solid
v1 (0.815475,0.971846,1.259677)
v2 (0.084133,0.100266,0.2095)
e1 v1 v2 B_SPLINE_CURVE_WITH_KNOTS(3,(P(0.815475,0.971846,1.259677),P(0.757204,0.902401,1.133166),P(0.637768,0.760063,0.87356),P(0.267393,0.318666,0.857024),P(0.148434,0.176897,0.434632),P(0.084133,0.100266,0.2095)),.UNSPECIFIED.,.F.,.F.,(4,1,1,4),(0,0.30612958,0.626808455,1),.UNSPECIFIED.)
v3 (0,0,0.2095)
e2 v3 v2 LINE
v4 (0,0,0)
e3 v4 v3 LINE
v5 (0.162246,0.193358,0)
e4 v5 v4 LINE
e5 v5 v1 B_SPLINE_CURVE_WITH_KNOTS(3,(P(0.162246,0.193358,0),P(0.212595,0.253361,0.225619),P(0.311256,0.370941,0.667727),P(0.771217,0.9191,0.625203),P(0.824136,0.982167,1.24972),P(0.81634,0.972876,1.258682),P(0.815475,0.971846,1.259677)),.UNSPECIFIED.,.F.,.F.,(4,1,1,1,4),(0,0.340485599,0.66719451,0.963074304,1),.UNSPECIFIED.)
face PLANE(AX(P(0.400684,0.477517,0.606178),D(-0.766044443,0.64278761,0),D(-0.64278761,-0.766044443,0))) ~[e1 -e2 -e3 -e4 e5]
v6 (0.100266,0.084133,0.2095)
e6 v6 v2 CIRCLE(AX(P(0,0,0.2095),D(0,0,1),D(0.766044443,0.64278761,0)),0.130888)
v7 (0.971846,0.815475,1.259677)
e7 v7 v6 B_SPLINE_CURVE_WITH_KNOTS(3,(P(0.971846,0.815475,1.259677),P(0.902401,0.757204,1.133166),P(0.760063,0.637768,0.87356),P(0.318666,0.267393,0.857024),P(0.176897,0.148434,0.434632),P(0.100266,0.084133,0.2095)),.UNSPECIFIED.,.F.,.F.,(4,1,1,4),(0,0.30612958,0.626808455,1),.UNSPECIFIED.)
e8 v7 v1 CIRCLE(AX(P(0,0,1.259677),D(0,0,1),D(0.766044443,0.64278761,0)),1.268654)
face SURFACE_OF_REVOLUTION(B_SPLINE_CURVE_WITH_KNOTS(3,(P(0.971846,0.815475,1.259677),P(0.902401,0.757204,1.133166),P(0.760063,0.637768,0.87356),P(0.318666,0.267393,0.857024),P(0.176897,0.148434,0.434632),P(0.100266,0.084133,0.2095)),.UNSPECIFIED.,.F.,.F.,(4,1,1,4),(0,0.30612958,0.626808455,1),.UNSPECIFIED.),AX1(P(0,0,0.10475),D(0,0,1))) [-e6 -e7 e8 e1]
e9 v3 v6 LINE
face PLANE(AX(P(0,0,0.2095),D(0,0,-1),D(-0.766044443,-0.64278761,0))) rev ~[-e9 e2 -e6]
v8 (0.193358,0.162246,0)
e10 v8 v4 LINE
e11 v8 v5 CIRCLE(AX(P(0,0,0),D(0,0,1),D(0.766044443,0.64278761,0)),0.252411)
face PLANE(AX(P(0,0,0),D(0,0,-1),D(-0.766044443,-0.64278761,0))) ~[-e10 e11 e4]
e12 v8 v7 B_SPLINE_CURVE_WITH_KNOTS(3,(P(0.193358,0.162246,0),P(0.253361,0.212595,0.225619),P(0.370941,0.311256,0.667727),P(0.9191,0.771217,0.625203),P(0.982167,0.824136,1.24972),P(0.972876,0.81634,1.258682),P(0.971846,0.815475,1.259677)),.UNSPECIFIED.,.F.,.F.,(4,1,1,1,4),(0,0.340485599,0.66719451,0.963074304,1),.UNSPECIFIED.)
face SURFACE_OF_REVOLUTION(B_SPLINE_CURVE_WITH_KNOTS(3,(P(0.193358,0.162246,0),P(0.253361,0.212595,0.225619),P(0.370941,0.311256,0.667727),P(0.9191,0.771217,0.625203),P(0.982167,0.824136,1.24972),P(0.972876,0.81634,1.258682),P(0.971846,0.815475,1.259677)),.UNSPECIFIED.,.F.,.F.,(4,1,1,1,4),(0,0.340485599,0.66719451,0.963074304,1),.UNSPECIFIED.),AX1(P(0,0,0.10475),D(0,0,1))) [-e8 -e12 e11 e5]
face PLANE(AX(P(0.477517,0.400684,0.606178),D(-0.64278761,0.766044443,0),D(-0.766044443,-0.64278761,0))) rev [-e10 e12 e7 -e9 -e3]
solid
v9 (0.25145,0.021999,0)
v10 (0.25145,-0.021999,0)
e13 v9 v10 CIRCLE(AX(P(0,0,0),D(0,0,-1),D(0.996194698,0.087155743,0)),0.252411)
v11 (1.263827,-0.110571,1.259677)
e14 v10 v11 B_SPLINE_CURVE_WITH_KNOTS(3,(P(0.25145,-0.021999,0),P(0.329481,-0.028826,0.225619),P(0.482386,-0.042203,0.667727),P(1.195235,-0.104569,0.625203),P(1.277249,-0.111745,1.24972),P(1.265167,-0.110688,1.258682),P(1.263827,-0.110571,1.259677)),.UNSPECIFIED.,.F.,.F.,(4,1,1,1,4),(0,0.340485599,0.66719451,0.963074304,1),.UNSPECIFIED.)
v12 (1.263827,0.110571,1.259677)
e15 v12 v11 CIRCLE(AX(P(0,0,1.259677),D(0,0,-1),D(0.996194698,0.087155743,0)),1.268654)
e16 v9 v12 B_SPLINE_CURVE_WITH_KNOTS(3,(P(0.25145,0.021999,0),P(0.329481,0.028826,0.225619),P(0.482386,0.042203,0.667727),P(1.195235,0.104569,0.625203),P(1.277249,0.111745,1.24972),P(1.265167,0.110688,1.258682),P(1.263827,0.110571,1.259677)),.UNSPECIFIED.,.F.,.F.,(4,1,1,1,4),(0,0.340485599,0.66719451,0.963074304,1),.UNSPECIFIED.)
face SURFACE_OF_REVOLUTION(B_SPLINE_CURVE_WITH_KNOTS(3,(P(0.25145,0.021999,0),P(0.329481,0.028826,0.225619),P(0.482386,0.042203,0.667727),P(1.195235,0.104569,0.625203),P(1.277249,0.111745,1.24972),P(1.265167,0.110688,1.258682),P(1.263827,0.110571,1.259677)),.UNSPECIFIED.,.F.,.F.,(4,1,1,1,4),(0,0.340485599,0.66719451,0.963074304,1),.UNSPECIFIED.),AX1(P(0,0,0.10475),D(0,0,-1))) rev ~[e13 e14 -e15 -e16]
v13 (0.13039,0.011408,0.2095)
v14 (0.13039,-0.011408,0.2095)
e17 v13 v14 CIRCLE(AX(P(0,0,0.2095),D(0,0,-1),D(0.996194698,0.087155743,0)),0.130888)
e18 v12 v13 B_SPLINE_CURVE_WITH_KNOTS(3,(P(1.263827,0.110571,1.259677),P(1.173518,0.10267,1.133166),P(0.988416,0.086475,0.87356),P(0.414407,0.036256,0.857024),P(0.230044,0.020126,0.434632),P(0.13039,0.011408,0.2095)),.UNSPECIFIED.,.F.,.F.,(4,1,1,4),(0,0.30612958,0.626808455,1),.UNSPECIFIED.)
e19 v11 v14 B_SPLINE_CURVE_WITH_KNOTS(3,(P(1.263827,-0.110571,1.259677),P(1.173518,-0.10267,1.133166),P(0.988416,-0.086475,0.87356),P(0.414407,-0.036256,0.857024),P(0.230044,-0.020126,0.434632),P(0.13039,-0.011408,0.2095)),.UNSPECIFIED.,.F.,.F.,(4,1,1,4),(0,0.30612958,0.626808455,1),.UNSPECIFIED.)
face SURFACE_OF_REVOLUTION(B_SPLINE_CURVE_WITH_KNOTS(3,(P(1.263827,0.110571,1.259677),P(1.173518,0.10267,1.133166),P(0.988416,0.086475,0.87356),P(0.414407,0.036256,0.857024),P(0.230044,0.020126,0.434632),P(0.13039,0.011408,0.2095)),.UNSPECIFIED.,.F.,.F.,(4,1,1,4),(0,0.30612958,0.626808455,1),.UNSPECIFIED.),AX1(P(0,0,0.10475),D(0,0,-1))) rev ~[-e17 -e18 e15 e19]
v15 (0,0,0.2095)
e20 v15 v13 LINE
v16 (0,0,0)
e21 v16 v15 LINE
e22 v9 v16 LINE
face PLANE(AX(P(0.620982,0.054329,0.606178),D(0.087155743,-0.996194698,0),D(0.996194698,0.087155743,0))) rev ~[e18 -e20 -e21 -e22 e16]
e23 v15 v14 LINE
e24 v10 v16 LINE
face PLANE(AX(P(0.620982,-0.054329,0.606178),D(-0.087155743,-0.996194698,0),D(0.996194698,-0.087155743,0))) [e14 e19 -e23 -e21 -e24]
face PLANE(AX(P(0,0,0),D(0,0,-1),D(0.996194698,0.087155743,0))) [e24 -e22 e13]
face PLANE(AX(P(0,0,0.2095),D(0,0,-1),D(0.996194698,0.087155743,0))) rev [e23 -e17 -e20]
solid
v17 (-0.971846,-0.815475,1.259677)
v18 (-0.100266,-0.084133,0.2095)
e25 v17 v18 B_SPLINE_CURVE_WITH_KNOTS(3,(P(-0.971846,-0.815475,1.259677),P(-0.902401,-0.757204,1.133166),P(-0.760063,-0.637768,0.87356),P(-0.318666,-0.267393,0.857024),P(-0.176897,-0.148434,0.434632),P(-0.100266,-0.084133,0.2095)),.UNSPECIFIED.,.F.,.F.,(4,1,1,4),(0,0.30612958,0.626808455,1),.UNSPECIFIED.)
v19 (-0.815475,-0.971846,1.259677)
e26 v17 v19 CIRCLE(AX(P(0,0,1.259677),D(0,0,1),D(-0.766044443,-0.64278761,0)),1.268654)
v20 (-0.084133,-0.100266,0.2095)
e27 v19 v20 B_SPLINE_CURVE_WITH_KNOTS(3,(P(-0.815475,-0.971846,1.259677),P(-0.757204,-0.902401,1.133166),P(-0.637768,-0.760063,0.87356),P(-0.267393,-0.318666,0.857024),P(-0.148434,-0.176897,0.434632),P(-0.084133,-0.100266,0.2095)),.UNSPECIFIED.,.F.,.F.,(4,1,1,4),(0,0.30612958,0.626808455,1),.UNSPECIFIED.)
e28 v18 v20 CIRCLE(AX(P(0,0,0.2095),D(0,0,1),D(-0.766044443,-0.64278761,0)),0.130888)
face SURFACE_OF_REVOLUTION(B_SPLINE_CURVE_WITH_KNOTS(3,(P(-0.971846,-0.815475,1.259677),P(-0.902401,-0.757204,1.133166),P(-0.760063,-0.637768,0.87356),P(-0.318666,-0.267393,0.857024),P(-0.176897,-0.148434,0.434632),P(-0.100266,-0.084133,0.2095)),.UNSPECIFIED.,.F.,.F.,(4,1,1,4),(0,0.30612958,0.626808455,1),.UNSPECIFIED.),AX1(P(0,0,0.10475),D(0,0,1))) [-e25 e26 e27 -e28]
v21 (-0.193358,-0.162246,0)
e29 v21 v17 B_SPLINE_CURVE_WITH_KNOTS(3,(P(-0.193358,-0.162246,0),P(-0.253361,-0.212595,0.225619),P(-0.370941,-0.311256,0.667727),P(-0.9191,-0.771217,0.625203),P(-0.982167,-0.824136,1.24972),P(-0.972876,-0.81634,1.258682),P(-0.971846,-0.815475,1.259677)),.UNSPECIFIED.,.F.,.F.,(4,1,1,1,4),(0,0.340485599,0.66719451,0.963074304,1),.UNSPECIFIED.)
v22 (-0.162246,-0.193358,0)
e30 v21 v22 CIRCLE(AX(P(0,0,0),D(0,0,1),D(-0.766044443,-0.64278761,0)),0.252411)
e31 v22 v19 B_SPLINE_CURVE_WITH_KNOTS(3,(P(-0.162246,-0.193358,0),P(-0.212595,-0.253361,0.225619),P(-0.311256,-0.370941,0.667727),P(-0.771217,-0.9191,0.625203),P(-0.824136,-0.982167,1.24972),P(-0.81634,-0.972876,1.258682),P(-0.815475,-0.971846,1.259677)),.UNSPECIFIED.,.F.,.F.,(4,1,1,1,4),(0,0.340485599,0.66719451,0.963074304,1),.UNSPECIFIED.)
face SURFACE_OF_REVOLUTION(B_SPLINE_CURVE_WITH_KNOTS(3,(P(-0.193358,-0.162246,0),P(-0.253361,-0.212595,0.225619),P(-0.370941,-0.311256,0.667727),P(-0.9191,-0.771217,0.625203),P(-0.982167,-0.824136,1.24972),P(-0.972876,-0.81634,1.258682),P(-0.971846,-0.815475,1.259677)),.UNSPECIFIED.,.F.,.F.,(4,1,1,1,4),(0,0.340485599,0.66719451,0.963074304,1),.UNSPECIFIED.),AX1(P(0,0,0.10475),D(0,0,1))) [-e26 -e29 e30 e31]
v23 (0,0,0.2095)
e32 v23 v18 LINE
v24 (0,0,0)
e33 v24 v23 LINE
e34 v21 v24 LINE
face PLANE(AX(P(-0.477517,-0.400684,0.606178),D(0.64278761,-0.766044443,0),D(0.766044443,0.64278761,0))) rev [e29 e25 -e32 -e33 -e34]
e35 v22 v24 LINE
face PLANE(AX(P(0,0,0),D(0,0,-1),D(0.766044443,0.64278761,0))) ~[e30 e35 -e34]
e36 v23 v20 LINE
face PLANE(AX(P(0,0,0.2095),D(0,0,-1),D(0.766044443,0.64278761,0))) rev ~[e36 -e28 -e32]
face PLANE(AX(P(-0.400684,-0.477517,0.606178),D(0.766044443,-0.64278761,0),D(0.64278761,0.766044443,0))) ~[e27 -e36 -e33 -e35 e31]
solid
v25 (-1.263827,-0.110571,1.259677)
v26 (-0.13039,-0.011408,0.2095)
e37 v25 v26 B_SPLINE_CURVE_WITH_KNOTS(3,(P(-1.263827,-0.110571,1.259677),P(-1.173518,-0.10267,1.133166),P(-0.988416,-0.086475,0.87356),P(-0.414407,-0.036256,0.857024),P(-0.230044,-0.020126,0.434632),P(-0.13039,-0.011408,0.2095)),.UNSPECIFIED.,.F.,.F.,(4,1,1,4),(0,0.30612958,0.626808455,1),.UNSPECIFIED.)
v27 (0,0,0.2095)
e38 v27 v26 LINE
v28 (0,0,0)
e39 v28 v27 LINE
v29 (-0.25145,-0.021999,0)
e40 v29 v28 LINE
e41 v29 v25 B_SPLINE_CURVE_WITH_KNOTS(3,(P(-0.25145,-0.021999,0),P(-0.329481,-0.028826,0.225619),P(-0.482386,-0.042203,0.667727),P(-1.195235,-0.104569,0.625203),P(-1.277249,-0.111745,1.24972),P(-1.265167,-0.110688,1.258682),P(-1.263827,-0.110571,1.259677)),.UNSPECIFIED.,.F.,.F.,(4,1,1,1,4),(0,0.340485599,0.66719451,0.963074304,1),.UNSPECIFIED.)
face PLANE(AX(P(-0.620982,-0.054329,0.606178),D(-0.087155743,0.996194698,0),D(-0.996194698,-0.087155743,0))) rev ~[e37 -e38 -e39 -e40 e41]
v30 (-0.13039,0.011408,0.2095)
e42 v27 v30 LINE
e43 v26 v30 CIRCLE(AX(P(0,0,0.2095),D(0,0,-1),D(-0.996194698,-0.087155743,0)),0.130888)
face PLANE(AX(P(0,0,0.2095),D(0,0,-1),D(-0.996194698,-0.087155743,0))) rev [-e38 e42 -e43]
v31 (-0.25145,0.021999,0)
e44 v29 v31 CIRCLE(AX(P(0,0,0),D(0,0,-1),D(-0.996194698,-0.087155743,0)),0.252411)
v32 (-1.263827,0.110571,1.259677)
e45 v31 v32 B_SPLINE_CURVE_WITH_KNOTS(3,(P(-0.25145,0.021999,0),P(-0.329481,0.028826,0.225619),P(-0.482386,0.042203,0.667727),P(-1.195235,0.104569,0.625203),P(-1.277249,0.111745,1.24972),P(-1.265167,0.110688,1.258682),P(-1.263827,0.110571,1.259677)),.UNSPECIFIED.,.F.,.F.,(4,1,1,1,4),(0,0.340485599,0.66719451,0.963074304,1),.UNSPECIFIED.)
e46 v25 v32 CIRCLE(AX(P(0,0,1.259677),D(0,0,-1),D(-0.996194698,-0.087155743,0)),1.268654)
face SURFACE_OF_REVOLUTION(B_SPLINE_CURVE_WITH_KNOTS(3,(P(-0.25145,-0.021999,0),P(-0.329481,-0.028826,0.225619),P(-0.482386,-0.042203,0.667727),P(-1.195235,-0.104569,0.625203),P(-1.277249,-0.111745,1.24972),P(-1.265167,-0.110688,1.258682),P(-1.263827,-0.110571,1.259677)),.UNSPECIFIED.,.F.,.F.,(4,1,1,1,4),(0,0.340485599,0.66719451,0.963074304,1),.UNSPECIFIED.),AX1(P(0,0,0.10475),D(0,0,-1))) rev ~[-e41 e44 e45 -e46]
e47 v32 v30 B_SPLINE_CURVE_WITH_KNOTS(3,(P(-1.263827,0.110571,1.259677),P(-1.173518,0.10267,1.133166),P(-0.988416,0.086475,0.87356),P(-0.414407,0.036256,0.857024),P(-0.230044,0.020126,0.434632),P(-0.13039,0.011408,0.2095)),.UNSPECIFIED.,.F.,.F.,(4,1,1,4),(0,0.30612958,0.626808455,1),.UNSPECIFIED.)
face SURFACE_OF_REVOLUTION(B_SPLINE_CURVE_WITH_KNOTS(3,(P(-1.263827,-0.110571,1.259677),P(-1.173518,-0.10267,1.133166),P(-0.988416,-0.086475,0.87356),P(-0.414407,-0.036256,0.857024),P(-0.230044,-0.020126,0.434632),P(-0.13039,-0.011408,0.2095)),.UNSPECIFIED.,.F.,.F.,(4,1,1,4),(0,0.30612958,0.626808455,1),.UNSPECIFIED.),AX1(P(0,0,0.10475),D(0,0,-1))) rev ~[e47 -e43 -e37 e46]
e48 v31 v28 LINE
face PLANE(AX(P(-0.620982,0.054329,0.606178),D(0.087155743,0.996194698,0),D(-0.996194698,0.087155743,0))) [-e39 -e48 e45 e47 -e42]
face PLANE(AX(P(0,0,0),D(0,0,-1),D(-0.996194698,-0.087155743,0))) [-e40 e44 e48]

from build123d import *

# Parameters (mm, degrees)
F1_ANGLE_BACK = 5
F1_ANGLE      = 10
F3_COUNT      = 2


# Not quite as in the source:
# - a feature of the source that left no trace in its solid (it failed there, or was rolled back) is left out
# - a pattern or mirror of a feature is missing from the dataset's text; its kind, count and spacing are read off the source's solid


with BuildPart() as f1:
    # F0 (on Front) → F1 (revolve)
    with BuildSketch(Plane.XZ, mode=Mode.PRIVATE) as f1_sk:
        with BuildLine():
            add(Edge.make_bspline(
                [(-0.2524105464, 0), (-0.3307396385, 0.2256188139), (-0.4842284802, 0.6677274801), (-1.1998001381, 0.6252029855), (-1.2821282206, 1.2497196877), (-1.27, 1.2586820995), (-1.2686543401, 1.2596765041)],
                knots=[0, 0, 0, 0, 0.3404855991, 0.6671945103, 0.9630743035, 1, 1, 1, 1], degree=3))
            Line((-0.2524105464, 0), (0, 0))
            Line((0, 0), (0, 0.2095003059))
            Line((0, 0.2095003059), (-0.1308880734, 0.2095003059))
            add(Edge.make_bspline(
                [(-1.2686543401, 1.2596765041), (-1.1780005744, 1.133165691), (-0.9921915467, 0.8735596961), (-0.4159894857, 0.8570240231), (-0.230923084, 0.434631534), (-0.1308880734, 0.2095003059)],
                knots=[0, 0, 0, 0, 0.3061295799, 0.6268084555, 1, 1, 1, 1], degree=3))
        make_face()
    revolve(f1_sk.sketch.rotate(Axis((0, 0, 0.104750153), (0, 0, -1)), -F1_ANGLE_BACK), axis=Axis((0, 0, 0.104750153), (0, 0, -1)), revolution_arc=F1_ANGLE)

    # F1_copies: F1 across plane


with BuildPart() as f1_1:
    add(f1.part)
    add(f1.part.mirror(Plane(origin=(0, 0, 0), x_dir=(-0.3826834324, 0.9238795325, 0), z_dir=(0.9238795325, 0.3826834324, 0))))


with BuildPart() as f3_1:
    # F3: instance of F1
    add(f1_1.part.rotate(Axis((0, 0, 0.104750153), (0, 0, 1)), 1 * 360 / F3_COUNT))


solid = Compound([f1_1.part, f3_1.part])
